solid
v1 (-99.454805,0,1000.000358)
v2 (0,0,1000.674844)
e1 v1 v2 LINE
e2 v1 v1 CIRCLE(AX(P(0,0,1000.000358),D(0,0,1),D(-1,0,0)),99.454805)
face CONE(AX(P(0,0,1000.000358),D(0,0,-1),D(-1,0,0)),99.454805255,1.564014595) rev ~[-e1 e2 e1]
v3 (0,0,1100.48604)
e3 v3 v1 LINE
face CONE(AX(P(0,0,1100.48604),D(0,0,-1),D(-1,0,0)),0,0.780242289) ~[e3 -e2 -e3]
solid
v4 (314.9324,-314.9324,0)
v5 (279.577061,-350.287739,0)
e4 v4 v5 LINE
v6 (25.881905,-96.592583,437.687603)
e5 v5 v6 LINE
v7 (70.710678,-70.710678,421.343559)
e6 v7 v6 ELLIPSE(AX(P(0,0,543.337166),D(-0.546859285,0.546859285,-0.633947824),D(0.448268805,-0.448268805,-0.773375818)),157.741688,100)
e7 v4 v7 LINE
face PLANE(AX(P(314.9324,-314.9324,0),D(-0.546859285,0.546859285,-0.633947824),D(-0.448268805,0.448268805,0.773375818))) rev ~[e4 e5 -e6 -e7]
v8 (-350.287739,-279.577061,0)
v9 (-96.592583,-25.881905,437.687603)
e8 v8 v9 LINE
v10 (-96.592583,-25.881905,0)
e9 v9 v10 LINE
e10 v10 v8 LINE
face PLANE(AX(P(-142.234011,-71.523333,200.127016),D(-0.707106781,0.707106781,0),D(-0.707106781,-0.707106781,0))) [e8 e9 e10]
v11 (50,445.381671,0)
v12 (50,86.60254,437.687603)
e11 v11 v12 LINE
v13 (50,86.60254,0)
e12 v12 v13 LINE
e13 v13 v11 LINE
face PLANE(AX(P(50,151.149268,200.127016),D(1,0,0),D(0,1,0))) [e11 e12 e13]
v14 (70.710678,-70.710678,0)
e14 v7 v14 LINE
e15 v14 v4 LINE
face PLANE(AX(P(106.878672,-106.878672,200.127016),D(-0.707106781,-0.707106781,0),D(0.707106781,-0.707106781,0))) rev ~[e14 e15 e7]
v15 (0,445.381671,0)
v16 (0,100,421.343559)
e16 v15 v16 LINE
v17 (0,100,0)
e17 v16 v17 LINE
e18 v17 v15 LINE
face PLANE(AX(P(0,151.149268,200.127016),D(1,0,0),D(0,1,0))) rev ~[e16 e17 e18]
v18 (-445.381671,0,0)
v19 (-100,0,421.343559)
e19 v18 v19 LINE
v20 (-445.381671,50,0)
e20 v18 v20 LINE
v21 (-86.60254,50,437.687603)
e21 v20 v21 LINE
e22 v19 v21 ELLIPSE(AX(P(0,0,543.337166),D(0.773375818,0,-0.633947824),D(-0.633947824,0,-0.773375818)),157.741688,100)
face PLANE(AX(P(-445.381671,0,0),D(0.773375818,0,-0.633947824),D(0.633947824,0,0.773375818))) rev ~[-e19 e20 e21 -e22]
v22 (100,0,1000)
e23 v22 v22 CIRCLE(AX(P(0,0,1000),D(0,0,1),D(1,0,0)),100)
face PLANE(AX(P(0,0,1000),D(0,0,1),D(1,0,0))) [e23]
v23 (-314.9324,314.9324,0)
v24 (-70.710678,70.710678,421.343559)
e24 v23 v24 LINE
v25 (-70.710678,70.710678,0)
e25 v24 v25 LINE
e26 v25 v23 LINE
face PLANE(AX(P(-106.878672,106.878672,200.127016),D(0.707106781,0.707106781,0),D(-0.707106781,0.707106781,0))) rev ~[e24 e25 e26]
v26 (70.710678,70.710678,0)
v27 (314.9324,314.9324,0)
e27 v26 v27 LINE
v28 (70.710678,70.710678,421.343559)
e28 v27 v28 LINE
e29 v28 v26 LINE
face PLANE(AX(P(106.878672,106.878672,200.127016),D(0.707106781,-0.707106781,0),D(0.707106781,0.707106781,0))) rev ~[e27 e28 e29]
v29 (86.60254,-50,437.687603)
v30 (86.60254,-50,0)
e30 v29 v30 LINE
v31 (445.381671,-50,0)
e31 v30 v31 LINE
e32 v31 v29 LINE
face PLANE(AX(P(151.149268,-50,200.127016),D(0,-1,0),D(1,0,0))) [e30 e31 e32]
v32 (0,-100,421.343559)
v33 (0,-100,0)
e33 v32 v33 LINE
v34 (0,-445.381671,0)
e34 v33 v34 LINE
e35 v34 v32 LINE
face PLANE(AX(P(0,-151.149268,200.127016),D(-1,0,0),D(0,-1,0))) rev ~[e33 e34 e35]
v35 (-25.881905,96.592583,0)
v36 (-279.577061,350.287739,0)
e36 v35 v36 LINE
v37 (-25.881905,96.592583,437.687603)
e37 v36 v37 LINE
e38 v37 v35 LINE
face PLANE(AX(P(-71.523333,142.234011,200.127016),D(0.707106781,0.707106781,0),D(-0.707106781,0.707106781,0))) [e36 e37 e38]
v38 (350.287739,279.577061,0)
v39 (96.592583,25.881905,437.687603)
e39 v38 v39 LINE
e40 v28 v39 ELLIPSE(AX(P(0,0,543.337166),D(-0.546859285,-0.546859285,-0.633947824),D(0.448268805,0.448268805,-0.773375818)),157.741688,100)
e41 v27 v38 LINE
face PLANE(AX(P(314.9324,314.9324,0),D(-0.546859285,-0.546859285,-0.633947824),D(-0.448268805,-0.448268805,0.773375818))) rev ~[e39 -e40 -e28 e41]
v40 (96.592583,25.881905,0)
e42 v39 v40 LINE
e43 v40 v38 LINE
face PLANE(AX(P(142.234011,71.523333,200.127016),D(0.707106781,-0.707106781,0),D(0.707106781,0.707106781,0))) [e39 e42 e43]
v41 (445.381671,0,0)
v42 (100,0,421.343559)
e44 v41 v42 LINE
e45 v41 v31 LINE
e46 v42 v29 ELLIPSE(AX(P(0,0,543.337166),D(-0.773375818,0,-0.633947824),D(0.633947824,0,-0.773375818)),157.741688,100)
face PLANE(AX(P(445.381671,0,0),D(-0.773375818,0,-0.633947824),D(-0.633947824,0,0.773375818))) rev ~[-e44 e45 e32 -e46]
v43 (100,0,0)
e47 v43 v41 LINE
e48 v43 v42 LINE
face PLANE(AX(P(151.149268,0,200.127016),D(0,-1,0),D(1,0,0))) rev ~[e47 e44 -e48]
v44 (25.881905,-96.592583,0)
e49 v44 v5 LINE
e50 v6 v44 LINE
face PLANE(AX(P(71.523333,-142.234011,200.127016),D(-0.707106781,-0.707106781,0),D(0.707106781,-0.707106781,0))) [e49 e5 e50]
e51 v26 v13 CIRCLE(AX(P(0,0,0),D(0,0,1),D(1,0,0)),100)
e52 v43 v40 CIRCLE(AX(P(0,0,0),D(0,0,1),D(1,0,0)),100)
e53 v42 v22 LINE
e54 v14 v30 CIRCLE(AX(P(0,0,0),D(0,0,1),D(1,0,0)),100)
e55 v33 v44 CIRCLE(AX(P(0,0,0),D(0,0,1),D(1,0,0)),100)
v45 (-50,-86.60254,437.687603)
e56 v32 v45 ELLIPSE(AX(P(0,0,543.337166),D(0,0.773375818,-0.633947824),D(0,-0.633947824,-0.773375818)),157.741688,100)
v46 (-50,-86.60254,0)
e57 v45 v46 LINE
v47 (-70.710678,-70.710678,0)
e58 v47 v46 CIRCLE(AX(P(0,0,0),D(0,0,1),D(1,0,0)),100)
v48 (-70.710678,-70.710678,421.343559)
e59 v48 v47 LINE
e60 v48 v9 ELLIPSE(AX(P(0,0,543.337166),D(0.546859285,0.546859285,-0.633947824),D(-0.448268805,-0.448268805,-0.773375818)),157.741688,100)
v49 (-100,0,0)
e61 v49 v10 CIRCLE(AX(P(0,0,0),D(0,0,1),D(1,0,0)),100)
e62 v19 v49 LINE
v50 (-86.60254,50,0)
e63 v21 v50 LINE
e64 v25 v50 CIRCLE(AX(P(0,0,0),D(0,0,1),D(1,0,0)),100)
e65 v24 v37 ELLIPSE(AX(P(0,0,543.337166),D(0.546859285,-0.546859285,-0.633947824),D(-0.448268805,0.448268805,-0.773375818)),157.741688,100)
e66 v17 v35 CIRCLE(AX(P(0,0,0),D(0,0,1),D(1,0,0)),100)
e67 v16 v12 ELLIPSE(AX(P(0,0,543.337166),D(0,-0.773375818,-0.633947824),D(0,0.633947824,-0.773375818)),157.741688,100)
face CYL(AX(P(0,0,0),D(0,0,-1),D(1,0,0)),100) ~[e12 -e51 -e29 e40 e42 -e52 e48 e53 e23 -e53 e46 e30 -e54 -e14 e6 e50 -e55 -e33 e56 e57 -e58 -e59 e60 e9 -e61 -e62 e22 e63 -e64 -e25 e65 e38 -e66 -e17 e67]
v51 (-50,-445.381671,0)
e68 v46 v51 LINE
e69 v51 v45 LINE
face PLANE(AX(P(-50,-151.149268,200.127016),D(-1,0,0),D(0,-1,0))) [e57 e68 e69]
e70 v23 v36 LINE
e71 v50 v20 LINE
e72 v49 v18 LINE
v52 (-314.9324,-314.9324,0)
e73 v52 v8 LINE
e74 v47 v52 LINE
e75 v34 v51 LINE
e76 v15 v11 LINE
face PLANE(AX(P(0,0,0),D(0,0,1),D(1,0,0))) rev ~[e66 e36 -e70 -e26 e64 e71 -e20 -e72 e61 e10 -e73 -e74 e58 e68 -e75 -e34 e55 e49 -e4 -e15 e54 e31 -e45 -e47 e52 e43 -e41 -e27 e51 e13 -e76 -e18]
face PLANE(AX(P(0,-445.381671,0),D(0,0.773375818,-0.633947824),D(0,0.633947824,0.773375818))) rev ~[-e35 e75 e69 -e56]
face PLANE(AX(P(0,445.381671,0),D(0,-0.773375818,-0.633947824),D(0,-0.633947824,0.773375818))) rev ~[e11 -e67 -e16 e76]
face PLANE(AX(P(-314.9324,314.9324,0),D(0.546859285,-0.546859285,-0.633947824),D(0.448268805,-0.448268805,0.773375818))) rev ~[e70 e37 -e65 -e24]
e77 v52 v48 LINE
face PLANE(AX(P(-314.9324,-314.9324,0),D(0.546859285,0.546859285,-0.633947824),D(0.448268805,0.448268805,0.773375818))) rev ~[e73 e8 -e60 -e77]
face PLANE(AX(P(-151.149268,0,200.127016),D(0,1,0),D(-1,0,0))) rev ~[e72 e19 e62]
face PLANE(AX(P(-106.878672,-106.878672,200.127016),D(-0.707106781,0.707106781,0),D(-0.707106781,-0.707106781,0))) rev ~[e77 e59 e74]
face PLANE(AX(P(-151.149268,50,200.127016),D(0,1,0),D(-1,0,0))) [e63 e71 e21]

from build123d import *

# Parameters (mm, degrees)
F0_R            = 100
F1_DEPTH        = 1000
F3_DEPTH        = 50
F3_COPIES_COUNT = 8


# Not quite as in the source:
# - a pattern or mirror of a feature is missing from the dataset's text; its kind, count and spacing are read off the source's solid


with BuildPart() as f1:
    # F0 (on Top) → F1 (new body)
    with BuildSketch(Plane.XY):
        Circle(F0_R)
    extrude(amount=F1_DEPTH)

    # F2 (on Right) → F3 (join)
    with BuildSketch(Plane.YZ):
        Polygon((0, 543.3371663094), (0, 0), (445.3816711903, 0), align=None)
    f3 = extrude(amount=F3_DEPTH)

    # F3_copies: F3 ×8 about axis
    f3_copies_axis = Axis((0, 0, 0), (0, 0, 1))
    for i in range(1, F3_COPIES_COUNT):
        add(f3.rotate(f3_copies_axis, i * 360 / F3_COPIES_COUNT))


with BuildPart() as f5:
    # F4 (on Front) → F5 (revolve)
    with BuildSketch(Plane.XZ):
        Polygon((0, 1100.4860401154), (-99.4548052549, 1000.0003576279), (0, 1000.6748437881), align=None)
    revolve(axis=Axis((0, 0, 1000), (0, 0, 1)))


solid = Compound([f1.part, f5.part])
